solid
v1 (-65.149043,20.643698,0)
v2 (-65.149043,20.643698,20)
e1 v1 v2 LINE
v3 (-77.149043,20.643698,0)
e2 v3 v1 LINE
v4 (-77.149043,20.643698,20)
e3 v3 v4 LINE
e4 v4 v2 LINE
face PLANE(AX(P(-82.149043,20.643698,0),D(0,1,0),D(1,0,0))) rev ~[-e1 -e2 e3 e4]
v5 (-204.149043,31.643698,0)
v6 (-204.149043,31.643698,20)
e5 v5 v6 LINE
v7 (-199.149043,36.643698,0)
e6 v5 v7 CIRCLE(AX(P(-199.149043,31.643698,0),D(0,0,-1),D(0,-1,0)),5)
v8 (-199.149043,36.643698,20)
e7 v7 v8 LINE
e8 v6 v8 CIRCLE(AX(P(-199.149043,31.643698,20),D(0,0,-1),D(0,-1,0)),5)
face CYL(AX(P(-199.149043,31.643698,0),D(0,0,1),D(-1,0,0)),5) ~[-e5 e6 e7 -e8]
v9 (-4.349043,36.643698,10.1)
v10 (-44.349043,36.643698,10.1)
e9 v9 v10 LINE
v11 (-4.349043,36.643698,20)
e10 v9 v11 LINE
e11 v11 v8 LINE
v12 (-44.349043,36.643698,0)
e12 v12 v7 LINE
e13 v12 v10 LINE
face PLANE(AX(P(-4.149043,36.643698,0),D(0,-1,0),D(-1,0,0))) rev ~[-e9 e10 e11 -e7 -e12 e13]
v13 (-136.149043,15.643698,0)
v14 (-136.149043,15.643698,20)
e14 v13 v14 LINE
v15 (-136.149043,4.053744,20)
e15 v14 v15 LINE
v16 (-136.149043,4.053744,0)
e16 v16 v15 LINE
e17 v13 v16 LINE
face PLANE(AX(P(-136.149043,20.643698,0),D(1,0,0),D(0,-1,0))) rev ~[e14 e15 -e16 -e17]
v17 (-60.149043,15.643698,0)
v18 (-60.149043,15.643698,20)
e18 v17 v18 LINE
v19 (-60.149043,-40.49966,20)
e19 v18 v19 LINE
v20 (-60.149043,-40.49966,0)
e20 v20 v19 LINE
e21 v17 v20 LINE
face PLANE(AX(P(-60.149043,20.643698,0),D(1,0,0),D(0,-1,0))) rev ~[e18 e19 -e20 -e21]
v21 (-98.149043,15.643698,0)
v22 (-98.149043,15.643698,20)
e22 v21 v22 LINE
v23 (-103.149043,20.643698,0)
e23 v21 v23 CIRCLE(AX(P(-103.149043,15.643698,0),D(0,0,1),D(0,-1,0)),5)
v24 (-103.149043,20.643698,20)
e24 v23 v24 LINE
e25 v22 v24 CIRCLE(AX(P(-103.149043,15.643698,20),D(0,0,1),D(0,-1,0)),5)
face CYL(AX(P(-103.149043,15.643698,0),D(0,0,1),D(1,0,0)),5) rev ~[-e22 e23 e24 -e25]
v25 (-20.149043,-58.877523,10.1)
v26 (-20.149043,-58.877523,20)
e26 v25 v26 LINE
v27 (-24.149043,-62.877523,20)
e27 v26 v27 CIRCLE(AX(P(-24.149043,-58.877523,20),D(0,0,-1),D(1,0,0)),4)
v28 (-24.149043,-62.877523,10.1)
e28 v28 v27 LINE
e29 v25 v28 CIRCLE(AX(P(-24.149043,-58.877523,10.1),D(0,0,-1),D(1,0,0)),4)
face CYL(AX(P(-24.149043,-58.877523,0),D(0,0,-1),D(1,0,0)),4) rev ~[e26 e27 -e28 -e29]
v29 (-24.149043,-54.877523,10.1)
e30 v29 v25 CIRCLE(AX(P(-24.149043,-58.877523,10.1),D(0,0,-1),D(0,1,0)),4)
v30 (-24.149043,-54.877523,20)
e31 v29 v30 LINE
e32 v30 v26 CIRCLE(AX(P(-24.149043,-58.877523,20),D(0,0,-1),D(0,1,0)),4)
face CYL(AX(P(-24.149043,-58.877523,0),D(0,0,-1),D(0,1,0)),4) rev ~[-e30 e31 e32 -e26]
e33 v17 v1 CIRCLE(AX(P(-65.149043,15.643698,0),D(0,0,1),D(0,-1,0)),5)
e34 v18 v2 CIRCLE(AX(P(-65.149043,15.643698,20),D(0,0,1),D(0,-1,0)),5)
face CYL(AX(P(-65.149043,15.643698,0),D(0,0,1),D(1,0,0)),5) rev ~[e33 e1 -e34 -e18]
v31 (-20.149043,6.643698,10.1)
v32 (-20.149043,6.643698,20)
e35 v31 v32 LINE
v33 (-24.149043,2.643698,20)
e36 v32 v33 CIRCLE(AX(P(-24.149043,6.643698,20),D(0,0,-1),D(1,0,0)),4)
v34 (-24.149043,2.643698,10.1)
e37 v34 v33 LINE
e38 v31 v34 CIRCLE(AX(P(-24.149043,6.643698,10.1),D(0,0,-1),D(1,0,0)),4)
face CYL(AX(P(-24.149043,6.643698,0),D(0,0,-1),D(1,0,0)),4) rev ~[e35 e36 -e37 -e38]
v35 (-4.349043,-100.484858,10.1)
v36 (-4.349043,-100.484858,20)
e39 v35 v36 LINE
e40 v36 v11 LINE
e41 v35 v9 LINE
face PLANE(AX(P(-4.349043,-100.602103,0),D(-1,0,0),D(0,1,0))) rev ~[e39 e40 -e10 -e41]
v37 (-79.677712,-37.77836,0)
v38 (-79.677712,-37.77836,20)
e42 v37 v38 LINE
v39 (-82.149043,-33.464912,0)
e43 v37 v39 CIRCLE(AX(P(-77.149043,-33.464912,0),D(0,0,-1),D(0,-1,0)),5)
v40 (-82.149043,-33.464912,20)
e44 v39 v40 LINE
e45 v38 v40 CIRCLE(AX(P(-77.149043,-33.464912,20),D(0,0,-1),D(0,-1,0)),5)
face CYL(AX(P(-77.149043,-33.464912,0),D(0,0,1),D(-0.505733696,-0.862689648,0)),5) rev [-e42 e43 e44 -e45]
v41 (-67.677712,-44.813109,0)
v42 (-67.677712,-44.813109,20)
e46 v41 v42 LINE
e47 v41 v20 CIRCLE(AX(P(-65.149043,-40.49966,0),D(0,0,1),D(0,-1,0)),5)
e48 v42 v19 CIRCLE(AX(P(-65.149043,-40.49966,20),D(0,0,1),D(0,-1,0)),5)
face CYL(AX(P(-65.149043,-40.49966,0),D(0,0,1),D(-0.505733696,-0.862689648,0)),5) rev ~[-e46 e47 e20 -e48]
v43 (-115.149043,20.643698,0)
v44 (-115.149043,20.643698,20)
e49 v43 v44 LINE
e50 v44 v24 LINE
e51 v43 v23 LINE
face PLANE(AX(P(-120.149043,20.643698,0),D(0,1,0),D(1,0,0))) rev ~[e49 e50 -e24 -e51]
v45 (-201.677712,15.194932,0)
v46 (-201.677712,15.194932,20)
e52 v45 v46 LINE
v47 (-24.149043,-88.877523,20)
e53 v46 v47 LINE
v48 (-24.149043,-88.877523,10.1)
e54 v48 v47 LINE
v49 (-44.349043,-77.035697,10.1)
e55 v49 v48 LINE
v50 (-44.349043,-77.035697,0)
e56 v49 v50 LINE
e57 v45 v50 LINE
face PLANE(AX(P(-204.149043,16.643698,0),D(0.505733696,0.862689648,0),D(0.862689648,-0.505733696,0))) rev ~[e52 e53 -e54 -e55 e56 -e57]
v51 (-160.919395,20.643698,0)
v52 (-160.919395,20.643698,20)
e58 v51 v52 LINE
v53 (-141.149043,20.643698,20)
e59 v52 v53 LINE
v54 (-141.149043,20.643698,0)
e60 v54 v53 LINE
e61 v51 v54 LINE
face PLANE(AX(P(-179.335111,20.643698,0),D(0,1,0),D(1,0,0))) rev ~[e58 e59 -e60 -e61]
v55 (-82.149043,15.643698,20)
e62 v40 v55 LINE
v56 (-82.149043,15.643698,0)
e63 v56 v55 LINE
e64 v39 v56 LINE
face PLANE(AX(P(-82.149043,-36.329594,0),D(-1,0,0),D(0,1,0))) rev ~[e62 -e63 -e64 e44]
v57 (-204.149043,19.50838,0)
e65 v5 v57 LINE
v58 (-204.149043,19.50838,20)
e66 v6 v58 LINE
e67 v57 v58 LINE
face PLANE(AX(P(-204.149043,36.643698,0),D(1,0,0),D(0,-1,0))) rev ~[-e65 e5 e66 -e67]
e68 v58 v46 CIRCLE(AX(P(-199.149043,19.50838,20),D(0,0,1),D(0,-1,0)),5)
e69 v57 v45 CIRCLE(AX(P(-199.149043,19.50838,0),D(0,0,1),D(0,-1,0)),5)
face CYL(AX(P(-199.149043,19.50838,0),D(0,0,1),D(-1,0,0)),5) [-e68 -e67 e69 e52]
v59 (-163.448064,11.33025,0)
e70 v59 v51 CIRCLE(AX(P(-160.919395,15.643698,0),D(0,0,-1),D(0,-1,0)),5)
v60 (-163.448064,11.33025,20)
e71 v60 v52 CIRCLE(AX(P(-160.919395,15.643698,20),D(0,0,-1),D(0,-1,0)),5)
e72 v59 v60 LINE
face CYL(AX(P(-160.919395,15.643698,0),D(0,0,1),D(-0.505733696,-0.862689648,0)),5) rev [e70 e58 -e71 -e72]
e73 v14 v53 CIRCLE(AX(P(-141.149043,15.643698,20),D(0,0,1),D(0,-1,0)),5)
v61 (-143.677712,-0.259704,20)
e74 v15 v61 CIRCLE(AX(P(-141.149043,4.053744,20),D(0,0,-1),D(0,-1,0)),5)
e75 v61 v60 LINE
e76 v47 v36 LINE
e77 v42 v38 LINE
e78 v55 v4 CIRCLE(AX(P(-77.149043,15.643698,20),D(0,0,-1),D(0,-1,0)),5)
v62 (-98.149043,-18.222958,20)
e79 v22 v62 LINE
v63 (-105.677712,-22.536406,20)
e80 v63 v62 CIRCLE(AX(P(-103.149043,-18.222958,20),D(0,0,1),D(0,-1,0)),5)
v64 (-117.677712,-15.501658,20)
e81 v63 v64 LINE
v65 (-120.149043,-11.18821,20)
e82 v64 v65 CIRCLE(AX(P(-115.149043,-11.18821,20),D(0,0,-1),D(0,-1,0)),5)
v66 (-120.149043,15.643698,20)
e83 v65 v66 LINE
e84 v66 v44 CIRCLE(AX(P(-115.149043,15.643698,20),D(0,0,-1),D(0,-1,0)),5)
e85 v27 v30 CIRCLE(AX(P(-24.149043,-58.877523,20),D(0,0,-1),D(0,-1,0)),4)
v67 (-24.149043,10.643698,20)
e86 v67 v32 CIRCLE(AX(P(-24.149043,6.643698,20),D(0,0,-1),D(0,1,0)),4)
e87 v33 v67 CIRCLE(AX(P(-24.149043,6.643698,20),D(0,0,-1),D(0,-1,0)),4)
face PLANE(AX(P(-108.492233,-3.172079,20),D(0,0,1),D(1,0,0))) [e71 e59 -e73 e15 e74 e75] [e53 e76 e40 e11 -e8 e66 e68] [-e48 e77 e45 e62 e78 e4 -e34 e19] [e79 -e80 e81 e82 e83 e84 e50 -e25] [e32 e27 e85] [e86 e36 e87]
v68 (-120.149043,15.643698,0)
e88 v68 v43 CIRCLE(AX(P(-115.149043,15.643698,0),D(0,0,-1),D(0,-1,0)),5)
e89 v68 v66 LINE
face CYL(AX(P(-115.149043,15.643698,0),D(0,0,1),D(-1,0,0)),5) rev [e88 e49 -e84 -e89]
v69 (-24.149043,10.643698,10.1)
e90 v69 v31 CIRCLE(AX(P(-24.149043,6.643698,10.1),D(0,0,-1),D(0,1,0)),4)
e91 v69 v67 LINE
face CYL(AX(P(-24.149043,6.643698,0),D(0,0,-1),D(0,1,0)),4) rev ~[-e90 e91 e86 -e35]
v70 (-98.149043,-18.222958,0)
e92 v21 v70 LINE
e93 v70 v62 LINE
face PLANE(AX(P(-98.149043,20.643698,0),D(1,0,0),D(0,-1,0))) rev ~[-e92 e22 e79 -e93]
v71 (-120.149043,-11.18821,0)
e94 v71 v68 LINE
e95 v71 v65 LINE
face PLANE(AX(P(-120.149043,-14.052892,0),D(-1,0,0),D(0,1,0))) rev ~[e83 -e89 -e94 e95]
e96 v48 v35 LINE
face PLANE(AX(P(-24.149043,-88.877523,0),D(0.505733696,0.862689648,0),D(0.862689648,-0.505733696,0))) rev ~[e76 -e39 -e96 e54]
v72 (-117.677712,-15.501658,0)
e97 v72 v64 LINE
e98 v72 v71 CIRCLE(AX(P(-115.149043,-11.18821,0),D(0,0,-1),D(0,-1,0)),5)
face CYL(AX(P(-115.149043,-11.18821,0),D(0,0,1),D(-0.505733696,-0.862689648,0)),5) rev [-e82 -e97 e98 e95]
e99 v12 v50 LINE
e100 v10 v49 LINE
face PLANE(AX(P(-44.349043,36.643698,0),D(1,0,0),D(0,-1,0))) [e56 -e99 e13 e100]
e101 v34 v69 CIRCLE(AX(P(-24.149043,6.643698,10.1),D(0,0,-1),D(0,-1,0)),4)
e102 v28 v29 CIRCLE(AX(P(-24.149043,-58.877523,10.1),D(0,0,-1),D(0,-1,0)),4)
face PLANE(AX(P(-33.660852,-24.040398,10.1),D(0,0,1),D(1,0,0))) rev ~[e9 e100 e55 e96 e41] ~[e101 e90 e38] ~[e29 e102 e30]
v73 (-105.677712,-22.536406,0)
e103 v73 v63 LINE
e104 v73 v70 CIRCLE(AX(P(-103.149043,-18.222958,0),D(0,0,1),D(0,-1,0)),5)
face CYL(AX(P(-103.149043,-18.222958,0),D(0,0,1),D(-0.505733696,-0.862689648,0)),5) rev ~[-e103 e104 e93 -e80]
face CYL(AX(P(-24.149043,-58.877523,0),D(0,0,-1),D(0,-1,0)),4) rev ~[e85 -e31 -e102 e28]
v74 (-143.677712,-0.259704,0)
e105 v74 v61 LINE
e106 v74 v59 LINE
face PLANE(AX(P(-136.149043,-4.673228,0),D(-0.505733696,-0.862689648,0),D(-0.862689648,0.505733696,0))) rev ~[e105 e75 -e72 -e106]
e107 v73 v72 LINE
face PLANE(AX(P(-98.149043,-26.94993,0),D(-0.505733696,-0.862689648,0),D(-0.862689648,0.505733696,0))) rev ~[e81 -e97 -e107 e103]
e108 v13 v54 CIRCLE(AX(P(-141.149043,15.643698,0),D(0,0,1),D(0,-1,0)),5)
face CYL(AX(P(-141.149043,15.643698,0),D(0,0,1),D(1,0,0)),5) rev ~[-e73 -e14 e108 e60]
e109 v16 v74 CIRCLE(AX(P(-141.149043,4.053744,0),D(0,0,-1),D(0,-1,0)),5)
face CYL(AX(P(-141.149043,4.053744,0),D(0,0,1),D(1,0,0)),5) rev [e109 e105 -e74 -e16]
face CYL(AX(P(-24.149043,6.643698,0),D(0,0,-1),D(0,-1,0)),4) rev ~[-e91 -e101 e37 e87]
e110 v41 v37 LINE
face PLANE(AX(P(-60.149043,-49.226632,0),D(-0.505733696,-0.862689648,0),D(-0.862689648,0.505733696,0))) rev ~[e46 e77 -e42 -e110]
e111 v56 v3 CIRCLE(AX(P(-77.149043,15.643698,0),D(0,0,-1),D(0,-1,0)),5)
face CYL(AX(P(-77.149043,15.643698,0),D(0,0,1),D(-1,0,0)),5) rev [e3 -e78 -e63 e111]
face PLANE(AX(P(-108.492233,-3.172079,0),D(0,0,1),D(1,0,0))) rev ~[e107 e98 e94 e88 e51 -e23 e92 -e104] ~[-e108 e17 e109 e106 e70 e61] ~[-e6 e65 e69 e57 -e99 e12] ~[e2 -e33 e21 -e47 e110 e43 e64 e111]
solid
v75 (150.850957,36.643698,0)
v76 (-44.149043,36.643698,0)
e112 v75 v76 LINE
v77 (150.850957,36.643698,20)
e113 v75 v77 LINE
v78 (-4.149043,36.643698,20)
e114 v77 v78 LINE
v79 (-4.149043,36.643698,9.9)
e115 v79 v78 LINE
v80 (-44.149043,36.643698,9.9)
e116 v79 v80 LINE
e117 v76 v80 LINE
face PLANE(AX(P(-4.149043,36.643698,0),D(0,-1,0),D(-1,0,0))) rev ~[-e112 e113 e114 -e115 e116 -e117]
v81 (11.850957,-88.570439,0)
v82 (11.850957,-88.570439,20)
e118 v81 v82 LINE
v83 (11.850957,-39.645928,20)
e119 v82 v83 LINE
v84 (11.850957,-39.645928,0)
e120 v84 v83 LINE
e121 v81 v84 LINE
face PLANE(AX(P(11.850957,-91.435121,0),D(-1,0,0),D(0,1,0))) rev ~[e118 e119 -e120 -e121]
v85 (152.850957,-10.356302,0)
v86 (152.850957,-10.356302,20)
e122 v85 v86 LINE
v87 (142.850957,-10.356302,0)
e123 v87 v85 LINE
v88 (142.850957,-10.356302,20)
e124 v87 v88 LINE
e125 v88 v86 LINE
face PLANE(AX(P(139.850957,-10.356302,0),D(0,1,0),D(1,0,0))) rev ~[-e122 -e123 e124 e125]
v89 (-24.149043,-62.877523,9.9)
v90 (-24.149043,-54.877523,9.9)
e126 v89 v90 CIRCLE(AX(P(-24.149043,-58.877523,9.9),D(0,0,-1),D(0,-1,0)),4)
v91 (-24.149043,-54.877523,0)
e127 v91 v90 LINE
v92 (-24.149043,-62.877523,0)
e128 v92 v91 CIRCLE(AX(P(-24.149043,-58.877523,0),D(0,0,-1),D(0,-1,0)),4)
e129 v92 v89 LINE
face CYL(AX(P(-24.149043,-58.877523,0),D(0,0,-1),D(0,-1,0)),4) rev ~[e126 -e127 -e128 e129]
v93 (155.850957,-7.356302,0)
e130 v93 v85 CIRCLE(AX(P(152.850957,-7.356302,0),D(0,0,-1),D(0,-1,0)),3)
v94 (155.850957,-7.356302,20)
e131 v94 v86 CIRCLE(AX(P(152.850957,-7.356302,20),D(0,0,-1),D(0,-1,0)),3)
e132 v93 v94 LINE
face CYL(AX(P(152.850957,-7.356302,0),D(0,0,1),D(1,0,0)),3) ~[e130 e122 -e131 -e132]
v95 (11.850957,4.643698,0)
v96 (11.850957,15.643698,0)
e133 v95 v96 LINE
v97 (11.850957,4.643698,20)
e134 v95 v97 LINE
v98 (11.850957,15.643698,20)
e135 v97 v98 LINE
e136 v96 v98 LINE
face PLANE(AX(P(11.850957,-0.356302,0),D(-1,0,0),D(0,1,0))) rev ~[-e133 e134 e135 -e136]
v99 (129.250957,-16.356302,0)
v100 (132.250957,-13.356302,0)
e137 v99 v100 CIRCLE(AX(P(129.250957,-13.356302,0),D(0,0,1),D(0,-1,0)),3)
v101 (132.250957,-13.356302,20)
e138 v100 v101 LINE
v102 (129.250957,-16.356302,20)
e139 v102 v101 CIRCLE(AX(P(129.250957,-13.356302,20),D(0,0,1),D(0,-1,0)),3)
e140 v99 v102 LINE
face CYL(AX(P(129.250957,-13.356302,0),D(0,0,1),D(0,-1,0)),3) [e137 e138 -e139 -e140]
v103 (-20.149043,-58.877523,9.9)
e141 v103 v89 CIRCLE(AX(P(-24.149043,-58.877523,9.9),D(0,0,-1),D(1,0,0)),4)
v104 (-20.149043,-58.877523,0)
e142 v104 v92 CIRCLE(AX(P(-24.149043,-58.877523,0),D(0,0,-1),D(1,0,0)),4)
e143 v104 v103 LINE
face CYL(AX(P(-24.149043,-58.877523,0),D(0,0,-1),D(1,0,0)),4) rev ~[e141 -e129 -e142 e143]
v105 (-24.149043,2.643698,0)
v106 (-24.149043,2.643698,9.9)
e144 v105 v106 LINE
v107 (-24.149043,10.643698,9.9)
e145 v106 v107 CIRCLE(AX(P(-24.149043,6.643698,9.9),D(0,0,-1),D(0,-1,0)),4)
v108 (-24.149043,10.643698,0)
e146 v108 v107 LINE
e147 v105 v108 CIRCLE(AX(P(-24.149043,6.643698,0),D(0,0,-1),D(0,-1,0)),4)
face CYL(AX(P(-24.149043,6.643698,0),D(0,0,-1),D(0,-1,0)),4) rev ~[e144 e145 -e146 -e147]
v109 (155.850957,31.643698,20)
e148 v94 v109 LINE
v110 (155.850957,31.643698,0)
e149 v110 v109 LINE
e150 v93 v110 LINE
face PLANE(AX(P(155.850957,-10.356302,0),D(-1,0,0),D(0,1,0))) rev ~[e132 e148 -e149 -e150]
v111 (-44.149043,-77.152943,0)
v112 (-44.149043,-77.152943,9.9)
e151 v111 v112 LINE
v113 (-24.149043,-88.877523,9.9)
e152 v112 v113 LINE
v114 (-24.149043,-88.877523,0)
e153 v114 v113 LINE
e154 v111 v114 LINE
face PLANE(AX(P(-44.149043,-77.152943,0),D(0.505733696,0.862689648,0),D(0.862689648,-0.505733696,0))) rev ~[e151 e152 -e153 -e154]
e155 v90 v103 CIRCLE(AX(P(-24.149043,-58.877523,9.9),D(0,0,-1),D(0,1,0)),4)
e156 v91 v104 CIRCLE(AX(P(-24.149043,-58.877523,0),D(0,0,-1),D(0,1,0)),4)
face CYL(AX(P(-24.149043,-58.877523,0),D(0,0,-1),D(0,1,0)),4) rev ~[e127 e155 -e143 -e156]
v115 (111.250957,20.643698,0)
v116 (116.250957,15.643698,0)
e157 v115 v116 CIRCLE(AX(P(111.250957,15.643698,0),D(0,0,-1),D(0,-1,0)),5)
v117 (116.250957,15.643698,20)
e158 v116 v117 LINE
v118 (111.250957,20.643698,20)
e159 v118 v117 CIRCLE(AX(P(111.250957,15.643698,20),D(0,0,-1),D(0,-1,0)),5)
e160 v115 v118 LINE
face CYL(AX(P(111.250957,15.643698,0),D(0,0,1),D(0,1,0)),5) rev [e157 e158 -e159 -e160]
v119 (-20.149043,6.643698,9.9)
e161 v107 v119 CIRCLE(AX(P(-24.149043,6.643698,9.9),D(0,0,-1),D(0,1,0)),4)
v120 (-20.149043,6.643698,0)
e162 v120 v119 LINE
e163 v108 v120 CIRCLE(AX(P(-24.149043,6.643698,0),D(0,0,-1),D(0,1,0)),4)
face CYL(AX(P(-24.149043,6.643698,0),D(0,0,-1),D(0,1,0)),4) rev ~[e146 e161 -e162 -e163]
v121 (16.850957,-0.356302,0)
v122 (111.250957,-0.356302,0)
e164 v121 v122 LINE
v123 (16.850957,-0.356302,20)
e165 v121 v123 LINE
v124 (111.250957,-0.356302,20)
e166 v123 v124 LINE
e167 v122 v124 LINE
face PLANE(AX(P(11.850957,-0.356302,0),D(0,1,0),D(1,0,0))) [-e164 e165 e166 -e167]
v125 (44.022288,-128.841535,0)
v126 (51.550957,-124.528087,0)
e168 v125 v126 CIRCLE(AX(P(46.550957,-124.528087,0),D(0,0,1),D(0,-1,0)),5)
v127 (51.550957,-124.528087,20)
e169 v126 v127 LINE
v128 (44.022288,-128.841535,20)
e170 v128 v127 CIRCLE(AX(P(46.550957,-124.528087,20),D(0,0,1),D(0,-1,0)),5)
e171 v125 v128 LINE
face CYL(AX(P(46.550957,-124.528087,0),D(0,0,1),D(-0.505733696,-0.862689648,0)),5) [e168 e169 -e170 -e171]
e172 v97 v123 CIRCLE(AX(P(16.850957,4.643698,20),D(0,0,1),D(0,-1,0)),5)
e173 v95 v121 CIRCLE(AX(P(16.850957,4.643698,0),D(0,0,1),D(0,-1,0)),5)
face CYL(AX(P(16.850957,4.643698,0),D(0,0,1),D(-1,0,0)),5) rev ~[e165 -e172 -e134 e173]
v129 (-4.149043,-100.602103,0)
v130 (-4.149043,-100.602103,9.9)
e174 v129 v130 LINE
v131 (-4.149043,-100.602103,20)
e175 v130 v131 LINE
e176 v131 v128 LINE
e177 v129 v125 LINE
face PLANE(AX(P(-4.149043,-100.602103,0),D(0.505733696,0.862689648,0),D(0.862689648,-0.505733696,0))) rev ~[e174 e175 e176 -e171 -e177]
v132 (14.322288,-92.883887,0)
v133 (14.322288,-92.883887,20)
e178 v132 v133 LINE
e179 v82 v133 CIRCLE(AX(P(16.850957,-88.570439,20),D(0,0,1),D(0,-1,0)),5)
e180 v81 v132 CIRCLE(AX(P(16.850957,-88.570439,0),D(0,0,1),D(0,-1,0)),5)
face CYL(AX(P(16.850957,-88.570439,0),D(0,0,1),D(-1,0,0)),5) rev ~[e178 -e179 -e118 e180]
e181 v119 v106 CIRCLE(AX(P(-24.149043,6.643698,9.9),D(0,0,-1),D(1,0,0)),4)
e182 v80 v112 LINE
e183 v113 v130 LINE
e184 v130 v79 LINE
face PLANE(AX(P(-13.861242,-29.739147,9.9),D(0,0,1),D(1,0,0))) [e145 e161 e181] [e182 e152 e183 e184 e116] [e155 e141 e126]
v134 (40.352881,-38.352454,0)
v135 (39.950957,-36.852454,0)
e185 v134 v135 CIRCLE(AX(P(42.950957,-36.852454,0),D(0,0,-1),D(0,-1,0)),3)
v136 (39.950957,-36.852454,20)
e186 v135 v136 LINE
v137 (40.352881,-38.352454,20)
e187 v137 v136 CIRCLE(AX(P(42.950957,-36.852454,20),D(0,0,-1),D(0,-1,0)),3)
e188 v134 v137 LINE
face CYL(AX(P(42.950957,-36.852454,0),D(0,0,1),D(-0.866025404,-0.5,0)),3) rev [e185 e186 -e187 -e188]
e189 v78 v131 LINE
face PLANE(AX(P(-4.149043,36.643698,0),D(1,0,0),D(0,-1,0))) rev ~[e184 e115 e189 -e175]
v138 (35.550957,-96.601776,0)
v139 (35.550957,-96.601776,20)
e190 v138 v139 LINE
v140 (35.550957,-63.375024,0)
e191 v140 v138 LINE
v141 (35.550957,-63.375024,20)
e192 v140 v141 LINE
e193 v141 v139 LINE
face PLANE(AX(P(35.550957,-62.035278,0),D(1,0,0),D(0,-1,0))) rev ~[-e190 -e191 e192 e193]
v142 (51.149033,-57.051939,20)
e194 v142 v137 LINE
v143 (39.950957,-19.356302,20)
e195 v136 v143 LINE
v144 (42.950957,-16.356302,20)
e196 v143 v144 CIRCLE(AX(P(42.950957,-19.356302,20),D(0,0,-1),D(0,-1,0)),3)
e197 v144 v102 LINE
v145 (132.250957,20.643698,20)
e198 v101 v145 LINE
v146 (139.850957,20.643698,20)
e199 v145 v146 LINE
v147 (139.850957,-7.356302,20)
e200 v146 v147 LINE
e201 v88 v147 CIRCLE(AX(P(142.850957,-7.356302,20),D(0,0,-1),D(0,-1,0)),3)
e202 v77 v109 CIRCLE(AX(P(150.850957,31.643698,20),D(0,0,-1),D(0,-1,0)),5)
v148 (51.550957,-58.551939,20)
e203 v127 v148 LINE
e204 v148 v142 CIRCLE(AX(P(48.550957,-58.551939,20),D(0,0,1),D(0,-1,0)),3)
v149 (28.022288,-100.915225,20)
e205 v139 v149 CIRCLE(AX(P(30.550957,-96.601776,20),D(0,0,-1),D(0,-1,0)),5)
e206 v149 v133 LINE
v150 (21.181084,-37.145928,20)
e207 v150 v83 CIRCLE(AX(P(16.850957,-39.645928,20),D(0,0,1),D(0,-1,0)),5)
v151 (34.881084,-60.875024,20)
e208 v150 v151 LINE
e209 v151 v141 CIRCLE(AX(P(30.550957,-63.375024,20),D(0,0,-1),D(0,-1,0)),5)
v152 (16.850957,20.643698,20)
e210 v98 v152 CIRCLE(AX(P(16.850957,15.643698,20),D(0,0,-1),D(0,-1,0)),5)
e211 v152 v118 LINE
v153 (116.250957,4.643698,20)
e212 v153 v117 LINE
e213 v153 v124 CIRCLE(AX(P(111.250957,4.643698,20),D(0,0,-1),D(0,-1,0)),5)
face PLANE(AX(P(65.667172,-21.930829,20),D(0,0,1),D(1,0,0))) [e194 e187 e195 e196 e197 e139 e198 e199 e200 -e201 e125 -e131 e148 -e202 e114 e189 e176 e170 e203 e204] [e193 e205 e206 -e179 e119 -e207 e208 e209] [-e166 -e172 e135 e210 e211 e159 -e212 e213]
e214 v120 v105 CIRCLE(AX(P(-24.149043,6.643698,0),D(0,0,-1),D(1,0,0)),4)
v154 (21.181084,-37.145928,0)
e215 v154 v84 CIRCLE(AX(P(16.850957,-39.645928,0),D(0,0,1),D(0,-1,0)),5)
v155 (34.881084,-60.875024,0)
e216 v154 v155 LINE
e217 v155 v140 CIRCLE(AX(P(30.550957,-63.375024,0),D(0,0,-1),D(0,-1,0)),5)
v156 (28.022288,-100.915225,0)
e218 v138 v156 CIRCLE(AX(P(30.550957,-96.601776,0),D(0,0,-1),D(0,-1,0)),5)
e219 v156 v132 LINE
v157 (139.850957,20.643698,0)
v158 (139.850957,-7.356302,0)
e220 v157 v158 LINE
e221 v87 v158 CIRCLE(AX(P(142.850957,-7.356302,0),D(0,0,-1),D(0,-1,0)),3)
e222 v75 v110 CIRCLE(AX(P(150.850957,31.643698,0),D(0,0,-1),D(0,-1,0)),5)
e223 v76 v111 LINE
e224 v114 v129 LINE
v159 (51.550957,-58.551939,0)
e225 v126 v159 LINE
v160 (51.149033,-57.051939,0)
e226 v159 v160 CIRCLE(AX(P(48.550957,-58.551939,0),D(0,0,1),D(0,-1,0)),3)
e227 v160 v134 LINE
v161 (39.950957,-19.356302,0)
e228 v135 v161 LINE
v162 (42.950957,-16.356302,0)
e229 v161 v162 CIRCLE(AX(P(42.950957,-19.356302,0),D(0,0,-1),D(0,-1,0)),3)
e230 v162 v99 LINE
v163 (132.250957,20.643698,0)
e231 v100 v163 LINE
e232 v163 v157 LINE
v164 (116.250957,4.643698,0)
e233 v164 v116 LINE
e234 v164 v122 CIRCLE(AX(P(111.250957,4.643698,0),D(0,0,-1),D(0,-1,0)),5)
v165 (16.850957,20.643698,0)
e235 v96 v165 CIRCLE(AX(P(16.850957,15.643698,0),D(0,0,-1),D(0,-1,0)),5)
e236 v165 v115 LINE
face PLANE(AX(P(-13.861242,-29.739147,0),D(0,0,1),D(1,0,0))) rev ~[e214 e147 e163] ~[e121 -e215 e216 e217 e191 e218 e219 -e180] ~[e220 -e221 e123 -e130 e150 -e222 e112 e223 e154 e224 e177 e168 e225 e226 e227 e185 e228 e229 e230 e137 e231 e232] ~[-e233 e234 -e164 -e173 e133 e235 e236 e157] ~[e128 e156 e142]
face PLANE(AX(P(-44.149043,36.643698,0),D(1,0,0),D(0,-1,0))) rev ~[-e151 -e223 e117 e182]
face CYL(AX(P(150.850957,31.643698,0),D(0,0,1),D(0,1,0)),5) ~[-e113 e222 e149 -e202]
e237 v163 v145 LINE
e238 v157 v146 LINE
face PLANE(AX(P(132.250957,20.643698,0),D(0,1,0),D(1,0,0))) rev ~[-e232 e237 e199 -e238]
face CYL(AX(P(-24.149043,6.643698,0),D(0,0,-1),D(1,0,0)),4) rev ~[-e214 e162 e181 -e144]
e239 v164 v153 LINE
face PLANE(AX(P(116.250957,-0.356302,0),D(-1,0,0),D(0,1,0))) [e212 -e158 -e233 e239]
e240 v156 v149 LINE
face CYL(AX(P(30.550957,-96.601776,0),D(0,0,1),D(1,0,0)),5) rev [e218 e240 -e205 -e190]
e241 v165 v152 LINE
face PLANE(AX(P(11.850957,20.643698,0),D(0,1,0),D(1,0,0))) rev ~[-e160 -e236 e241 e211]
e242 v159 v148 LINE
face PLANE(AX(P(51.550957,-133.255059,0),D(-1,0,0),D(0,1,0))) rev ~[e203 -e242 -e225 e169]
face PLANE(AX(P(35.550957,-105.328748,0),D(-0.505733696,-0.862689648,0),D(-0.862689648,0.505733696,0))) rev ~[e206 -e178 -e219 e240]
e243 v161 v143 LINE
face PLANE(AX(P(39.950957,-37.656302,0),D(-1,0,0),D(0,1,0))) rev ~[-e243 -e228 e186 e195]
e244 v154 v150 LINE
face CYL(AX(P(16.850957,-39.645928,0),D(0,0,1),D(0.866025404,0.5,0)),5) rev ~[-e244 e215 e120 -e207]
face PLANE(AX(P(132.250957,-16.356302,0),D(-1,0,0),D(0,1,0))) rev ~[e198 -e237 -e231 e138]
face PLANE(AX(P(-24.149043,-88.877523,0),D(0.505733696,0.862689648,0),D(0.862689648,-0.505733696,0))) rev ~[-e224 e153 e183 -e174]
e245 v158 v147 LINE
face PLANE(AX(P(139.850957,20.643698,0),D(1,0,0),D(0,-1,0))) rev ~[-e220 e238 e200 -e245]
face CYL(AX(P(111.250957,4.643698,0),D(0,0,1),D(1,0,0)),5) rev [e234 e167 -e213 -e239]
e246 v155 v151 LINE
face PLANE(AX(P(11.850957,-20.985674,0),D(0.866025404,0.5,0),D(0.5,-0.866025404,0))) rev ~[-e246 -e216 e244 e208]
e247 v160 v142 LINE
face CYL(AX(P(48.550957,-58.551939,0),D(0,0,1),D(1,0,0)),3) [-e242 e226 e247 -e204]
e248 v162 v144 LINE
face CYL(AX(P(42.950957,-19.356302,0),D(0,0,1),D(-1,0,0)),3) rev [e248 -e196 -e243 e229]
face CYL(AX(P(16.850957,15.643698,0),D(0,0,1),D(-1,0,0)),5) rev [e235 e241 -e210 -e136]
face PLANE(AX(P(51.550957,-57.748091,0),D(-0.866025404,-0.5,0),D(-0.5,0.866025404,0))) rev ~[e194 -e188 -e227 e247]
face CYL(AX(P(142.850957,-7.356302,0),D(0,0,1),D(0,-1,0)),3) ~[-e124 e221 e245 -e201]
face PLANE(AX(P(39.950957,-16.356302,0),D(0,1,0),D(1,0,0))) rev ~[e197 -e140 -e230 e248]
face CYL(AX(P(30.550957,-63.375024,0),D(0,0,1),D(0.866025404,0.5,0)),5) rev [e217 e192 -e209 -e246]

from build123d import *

# Parameters (mm, degrees)
F0_W     = 104.4
F0_H     = 21
F1_DEPTH = 20
F2_DEPTH = 9.9
F3_DEPTH = 20
F4_DEPTH = 10.1
F5_DEPTH = 0.2
F6_R     = 5
F6_2_R   = 5
F7_R     = 3


with BuildPart() as f1:
    # F0 (on Top) → F1 (new body)
    with BuildSketch(Plane.XY):
        Polygon((155.8509568507, -10.3563018057), (155.8509568507, 36.6436981943), (-4.1490431493, 36.6436981943), (-4.1490431493, -100.6021034165), (51.5509568507, -133.2550591652), (51.5509568507, -57.7480911735), (39.9509568507, -37.6563018057), (39.9509568507, -16.3563018057), (132.2509568507, -16.3563018057), (132.2509568507, 20.6436981943), (139.8509568507, 20.6436981943), (139.8509568507, -10.3563018057), align=None)
        Polygon((11.8509568507, -91.4351209706), (11.8509568507, -20.985674113), (35.5509568507, -62.0352782524), (35.5509568507, -105.3287484615), align=None, mode=Mode.SUBTRACT)
        with Locations((64.0509568507, 10.1436981943)):
            Rectangle(F0_W, F0_H, mode=Mode.SUBTRACT)
    extrude(amount=F1_DEPTH)

    # F0 (on Top) → F2 (join)
    with BuildSketch(Plane.XY):
        with BuildLine():
            Line((-4.1490431493, -100.6021034165), (-4.1490431493, 36.6436981943))
            Line((-4.1490431493, 36.6436981943), (-24.1490431493, 36.6436981943))
            Line((-24.1490431493, 36.6436981943), (-24.1490431493, 10.6436981943))
            ThreePointArc((-24.1490431493, 10.6436981943), (-21.3206160245, 9.472125319), (-20.1490431493, 6.6436981943))
            ThreePointArc((-20.1490431493, 6.6436981943), (-21.3206160245, 3.8152710695), (-24.1490431493, 2.6436981943))
            Line((-24.1490431493, 2.6436981943), (-24.1490431493, -54.8775232555))
            ThreePointArc((-24.1490431493, -54.8775232555), (-21.3206160245, -56.0490961307), (-20.1490431493, -58.8775232555))
            ThreePointArc((-20.1490431493, -58.8775232555), (-21.3206160245, -61.7059503802), (-24.1490431493, -62.8775232555))
            Line((-24.1490431493, -62.8775232555), (-24.1490431493, -88.8775232555))
            Line((-24.1490431493, -88.8775232555), (-4.1490431493, -100.6021034165))
        make_face()
        with BuildLine():
            Line((-24.1490431493, 10.6436981943), (-24.1490431493, 36.6436981943))
            Line((-24.1490431493, 36.6436981943), (-44.1490431493, 36.6436981943))
            Line((-44.1490431493, 36.6436981943), (-44.1490431493, -77.1529430944))
            Line((-44.1490431493, -77.1529430944), (-24.1490431493, -88.8775232555))
            Line((-24.1490431493, -88.8775232555), (-24.1490431493, -62.8775232555))
            ThreePointArc((-24.1490431493, -62.8775232555), (-28.1490431493, -58.8775232555), (-24.1490431493, -54.8775232555))
            Line((-24.1490431493, -54.8775232555), (-24.1490431493, 2.6436981943))
            ThreePointArc((-24.1490431493, 2.6436981943), (-28.1490431493, 6.6436981943), (-24.1490431493, 10.6436981943))
        make_face()
    extrude(amount=F2_DEPTH)

    # F6
    f6_edges = [f1.edges().sort_by_distance(p)[0] for p in [
        (35.550957, -105.328748, 10),
        (11.850957, -91.435121, 10),
        (11.850957, -20.985674, 10),
        (35.550957, -62.035278, 10),
        (11.850957, 20.643698, 10),
        (11.850957, -0.356302, 10),
        (116.250957, -0.356302, 10),
        (116.250957, 20.643698, 10),
        (155.850957, 36.643698, 10),
        (51.550957, -133.255059, 10),
    ]]
    fillet(f6_edges, radius=F6_R)

    # F7
    f7_edges = [f1.edges().sort_by_distance(p)[0] for p in [
        (132.250957, -16.356302, 10),
        (139.850957, -10.356302, 10),
        (155.850957, -10.356302, 10),
        (51.550957, -57.748091, 10),
        (39.950957, -37.656302, 10),
        (39.950957, -16.356302, 10),
    ]]
    fillet(f7_edges, radius=F7_R)


with BuildPart() as f3:
    # F0 (on Top) → F3 (new body)
    with BuildSketch(Plane.XY):
        Polygon((-44.1490431493, -77.1529430944), (-44.1490431493, 36.6436981943), (-204.1490431493, 36.6436981943), (-204.1490431493, 16.6436981943), align=None)
        Polygon((-82.1490431493, 20.6436981943), (-60.1490431493, 20.6436981943), (-60.1490431493, -49.2266323907), (-82.1490431493, -36.3295942135), (-98.1490431493, -26.9499300847), (-120.1490431493, -14.0528919075), (-136.1490431493, -4.6732277786), (-179.335111435, 20.6436981943), (-136.1490431493, 20.6436981943), (-120.1490431493, 20.6436981943), (-98.1490431493, 20.6436981943), align=None, mode=Mode.SUBTRACT)
        with BuildLine():
            Line((-4.1490431493, -100.6021034165), (-4.1490431493, 36.6436981943))
            Line((-4.1490431493, 36.6436981943), (-24.1490431493, 36.6436981943))
            Line((-24.1490431493, 36.6436981943), (-24.1490431493, 10.6436981943))
            ThreePointArc((-24.1490431493, 10.6436981943), (-21.3206160245, 9.472125319), (-20.1490431493, 6.6436981943))
            ThreePointArc((-20.1490431493, 6.6436981943), (-21.3206160245, 3.8152710695), (-24.1490431493, 2.6436981943))
            Line((-24.1490431493, 2.6436981943), (-24.1490431493, -54.8775232555))
            ThreePointArc((-24.1490431493, -54.8775232555), (-21.3206160245, -56.0490961307), (-20.1490431493, -58.8775232555))
            ThreePointArc((-20.1490431493, -58.8775232555), (-21.3206160245, -61.7059503802), (-24.1490431493, -62.8775232555))
            Line((-24.1490431493, -62.8775232555), (-24.1490431493, -88.8775232555))
            Line((-24.1490431493, -88.8775232555), (-4.1490431493, -100.6021034165))
        make_face()
        with BuildLine():
            Line((-24.1490431493, 10.6436981943), (-24.1490431493, 36.6436981943))
            Line((-24.1490431493, 36.6436981943), (-44.1490431493, 36.6436981943))
            Line((-44.1490431493, 36.6436981943), (-44.1490431493, -77.1529430944))
            Line((-44.1490431493, -77.1529430944), (-24.1490431493, -88.8775232555))
            Line((-24.1490431493, -88.8775232555), (-24.1490431493, -62.8775232555))
            ThreePointArc((-24.1490431493, -62.8775232555), (-28.1490431493, -58.8775232555), (-24.1490431493, -54.8775232555))
            Line((-24.1490431493, -54.8775232555), (-24.1490431493, 2.6436981943))
            ThreePointArc((-24.1490431493, 2.6436981943), (-28.1490431493, 6.6436981943), (-24.1490431493, 10.6436981943))
        make_face()
        Polygon((-120.1490431493, -14.0528919075), (-120.1490431493, 20.6436981943), (-136.1490431493, 20.6436981943), (-136.1490431493, -4.6732277786), align=None)
        Polygon((-82.1490431493, -36.3295942135), (-82.1490431493, 20.6436981943), (-98.1490431493, 20.6436981943), (-98.1490431493, -26.9499300847), align=None)
    extrude(amount=F3_DEPTH)

    # F0 (on Top) → F4 (cut)
    with BuildSketch(Plane.XY):
        with BuildLine():
            Line((-24.1490431493, 10.6436981943), (-24.1490431493, 36.6436981943))
            Line((-24.1490431493, 36.6436981943), (-44.1490431493, 36.6436981943))
            Line((-44.1490431493, 36.6436981943), (-44.1490431493, -77.1529430944))
            Line((-44.1490431493, -77.1529430944), (-24.1490431493, -88.8775232555))
            Line((-24.1490431493, -88.8775232555), (-24.1490431493, -62.8775232555))
            ThreePointArc((-24.1490431493, -62.8775232555), (-28.1490431493, -58.8775232555), (-24.1490431493, -54.8775232555))
            Line((-24.1490431493, -54.8775232555), (-24.1490431493, 2.6436981943))
            ThreePointArc((-24.1490431493, 2.6436981943), (-28.1490431493, 6.6436981943), (-24.1490431493, 10.6436981943))
        make_face()
        with BuildLine():
            Line((-4.1490431493, -100.6021034165), (-4.1490431493, 36.6436981943))
            Line((-4.1490431493, 36.6436981943), (-24.1490431493, 36.6436981943))
            Line((-24.1490431493, 36.6436981943), (-24.1490431493, 10.6436981943))
            ThreePointArc((-24.1490431493, 10.6436981943), (-21.3206160245, 9.472125319), (-20.1490431493, 6.6436981943))
            ThreePointArc((-20.1490431493, 6.6436981943), (-21.3206160245, 3.8152710695), (-24.1490431493, 2.6436981943))
            Line((-24.1490431493, 2.6436981943), (-24.1490431493, -54.8775232555))
            ThreePointArc((-24.1490431493, -54.8775232555), (-21.3206160245, -56.0490961307), (-20.1490431493, -58.8775232555))
            ThreePointArc((-20.1490431493, -58.8775232555), (-21.3206160245, -61.7059503802), (-24.1490431493, -62.8775232555))
            Line((-24.1490431493, -62.8775232555), (-24.1490431493, -88.8775232555))
            Line((-24.1490431493, -88.8775232555), (-4.1490431493, -100.6021034165))
        make_face()
    extrude(amount=F4_DEPTH, mode=Mode.SUBTRACT)

    # F5 (cut): faces of the model
    f5_faces = [f3.faces().sort_by_distance(p)[0] for p in [
        (-44.1490431493, -20.2546224501, 5.05),
        (-4.1490431493, -31.9792026111, 15.05),
    ]]
    extrude(f5_faces, amount=-F5_DEPTH, mode=Mode.SUBTRACT)

    # F6#2
    f6_2_edges = [f3.edges().sort_by_distance(p)[0] for p in [
        (-179.335111, 20.643698, 10),
        (-136.149043, 20.643698, 10),
        (-136.149043, -4.673228, 10),
        (-98.149043, -26.94993, 10),
        (-98.149043, 20.643698, 10),
        (-120.149043, 20.643698, 10),
        (-120.149043, -14.052892, 10),
        (-60.149043, 20.643698, 10),
        (-60.149043, -49.226632, 10),
        (-82.149043, -36.329594, 10),
        (-82.149043, 20.643698, 10),
        (-204.149043, 16.643698, 10),
        (-204.149043, 36.643698, 10),
    ]]
    fillet(f6_2_edges, radius=F6_2_R)


solid = Compound([f1.part, f3.part])
